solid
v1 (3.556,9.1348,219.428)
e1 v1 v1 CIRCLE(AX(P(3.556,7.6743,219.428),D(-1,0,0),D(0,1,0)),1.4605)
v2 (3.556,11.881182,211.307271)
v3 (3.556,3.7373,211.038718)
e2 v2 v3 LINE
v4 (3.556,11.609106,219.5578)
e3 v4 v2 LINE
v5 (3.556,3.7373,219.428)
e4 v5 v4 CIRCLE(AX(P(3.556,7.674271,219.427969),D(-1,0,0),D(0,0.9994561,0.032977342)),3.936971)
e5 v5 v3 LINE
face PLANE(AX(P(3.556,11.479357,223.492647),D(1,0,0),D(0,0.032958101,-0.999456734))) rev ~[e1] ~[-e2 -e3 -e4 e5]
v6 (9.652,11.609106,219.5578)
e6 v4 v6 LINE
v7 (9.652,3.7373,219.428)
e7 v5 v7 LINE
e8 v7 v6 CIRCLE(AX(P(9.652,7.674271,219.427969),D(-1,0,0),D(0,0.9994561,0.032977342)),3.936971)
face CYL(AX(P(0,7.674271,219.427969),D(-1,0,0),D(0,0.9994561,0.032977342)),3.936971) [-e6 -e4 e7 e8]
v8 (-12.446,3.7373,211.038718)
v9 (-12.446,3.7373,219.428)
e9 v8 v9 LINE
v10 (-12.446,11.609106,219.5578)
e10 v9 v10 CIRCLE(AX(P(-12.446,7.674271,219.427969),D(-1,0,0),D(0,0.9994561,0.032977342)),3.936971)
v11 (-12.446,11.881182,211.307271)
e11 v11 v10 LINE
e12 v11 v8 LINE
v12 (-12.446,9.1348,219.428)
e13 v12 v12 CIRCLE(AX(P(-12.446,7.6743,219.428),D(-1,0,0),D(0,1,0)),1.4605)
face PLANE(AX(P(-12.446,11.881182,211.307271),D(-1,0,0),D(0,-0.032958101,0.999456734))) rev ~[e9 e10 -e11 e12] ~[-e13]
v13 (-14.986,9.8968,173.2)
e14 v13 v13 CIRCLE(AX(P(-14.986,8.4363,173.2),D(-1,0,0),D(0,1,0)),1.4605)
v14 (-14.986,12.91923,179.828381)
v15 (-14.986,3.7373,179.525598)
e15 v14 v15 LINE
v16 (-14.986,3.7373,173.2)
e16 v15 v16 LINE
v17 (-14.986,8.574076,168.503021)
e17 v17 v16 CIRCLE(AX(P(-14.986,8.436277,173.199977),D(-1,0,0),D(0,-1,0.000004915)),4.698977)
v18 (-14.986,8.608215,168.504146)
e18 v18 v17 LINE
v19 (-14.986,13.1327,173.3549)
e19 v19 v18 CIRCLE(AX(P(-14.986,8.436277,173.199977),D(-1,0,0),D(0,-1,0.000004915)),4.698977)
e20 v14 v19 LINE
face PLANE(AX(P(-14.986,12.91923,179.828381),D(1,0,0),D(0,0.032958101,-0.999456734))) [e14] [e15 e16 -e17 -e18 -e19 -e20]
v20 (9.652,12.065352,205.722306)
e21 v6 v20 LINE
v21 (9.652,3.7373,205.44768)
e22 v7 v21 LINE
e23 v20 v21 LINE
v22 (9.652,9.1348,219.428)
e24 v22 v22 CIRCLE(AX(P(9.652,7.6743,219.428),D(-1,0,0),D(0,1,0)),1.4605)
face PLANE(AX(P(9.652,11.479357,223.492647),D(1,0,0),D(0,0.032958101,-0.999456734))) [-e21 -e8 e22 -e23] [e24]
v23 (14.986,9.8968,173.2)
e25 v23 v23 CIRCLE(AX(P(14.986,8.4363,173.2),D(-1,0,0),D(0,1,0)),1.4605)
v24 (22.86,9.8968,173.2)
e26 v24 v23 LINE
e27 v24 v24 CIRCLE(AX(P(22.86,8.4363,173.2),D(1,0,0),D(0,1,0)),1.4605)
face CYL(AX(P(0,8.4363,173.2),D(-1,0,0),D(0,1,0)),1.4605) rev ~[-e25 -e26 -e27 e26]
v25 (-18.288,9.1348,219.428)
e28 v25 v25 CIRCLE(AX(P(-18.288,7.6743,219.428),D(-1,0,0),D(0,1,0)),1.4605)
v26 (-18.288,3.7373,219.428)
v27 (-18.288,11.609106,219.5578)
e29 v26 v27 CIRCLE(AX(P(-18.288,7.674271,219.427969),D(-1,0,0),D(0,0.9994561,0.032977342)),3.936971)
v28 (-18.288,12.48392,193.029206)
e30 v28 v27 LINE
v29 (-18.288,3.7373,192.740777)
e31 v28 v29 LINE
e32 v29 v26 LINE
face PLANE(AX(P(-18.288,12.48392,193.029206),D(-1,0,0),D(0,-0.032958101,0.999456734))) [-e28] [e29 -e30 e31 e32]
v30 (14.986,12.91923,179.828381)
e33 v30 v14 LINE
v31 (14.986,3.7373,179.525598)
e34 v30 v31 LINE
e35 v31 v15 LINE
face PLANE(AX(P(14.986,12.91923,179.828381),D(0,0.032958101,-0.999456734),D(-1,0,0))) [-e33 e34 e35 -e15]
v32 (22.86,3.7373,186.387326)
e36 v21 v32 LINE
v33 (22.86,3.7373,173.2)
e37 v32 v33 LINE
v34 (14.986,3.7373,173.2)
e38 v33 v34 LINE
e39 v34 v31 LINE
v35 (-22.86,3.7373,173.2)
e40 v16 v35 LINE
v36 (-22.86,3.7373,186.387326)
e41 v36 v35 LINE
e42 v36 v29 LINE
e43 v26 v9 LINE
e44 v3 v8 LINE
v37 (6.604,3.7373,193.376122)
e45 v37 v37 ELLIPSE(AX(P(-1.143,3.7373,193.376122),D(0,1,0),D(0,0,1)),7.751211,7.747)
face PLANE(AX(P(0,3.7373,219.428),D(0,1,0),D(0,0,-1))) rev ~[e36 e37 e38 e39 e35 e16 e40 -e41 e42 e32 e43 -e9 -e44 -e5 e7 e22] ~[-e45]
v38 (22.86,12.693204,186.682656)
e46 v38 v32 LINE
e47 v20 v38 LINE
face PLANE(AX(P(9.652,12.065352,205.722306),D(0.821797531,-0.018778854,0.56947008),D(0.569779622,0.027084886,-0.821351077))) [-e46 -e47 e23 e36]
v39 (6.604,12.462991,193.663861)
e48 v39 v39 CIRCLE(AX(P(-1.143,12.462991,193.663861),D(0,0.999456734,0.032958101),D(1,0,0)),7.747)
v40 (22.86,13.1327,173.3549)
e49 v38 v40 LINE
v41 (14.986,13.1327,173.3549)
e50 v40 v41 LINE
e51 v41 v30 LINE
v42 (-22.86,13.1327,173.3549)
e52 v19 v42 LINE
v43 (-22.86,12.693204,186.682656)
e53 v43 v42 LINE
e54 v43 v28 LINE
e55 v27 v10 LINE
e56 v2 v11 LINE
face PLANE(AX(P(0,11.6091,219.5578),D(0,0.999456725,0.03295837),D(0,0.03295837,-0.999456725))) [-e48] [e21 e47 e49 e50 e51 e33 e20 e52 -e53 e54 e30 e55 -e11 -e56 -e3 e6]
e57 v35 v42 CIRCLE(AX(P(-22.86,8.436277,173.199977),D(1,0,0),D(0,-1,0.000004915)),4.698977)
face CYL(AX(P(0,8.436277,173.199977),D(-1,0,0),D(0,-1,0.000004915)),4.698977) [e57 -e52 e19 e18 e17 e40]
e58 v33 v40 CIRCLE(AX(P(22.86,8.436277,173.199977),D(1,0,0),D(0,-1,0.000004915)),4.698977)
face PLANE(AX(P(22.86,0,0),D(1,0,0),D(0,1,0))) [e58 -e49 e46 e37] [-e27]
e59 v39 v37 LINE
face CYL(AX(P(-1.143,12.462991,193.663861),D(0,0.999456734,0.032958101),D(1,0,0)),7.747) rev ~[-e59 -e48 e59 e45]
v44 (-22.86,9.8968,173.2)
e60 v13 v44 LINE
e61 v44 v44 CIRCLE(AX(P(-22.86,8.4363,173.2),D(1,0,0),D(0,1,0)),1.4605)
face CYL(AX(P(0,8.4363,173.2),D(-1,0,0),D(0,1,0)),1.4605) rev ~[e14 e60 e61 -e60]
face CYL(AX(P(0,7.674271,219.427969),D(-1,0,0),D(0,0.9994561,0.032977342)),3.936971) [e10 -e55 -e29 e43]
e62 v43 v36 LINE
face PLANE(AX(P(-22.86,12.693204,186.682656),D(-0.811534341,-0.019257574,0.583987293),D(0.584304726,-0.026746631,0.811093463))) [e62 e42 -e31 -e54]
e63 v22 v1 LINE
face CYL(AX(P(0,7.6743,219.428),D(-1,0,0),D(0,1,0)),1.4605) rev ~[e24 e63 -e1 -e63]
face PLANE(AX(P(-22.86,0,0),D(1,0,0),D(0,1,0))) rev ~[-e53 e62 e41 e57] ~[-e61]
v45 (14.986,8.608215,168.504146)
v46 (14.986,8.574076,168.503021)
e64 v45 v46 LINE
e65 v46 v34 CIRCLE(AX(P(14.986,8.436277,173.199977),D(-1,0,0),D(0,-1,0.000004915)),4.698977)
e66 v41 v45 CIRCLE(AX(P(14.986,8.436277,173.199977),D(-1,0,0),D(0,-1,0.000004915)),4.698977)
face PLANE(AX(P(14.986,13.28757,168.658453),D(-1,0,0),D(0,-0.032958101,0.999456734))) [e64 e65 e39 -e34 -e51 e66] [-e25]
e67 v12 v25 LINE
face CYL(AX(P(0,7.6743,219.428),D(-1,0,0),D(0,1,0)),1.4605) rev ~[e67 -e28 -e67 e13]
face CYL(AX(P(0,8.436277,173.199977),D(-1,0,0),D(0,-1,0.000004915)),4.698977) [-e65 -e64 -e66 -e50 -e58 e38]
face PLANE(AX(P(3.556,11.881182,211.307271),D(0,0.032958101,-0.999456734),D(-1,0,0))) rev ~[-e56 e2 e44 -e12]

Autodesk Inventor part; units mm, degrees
ref_plane "YZ Plane" through (0, 0, 0) normal (1, 0, 0) x (0, 1, 0)
sketch "Sketch2" plane through (0, 0, 0) normal (1, 0, 0) x (0, 1, 0)
  arc A0 (11.6091, 219.5578) -> (3.7373, 219.428) centre (7.6743, 219.428) ccw
  circle A1 centre (7.6743, 219.428) radius 1.4605
  arc A2 (3.7373, 173.2) -> (13.1327, 173.3549) centre (8.4363, 173.2) ccw
  circle A3 centre (8.4363, 173.2) radius 1.4605
  line L0 (3.7373, 219.428) -> (3.7373, 173.2)
  line L1 (39.8145, 223.365) -> (24.6856, 223.365) construction
  line L2 (42.3544, 168.501) -> (22.3114, 168.501) construction
  line L3 (11.6091, 219.5578) -> (13.1327, 173.3549)
  point P0 (0, 0)
  point P1 (32.3329, 168.501)
  dimension "d0" = 7.874
  dimension "d1" = 2.921
  dimension "d2" = 9.398
  dimension "d3" = 2.921
  dimension "d4" = 54.864
extrude "Extrusion1" add sketch "Sketch2" along normal mid plane 45.72
sketch "Sketch3" plane through (-22.86, 13.1327, 173.3549) normal (0, 0.9994567, 0.0329581) x (1, 0, 0)
  line L0 (0, 0) -> (0, -46.228) projected
  line L1 (0, -50.165) -> (45.72, -50.165) projected
  line L2 (0, 4.699) -> (45.72, 4.699) projected
  line L3 (45.72, 4.699) -> (45.72, -0.1549) projected
  line L4 (0, -0.1549) -> (0, 4.699) projected
  line L5 (0, -50.165) -> (0, -46.228) projected
  line L6 (10.414, -50.165) -> (26.416, -50.165)
  line L7 (26.416, -50.165) -> (26.416, -37.973)
  line L8 (26.416, -37.973) -> (10.414, -37.973)
  line L9 (10.414, -37.973) -> (10.414, -50.165)
  line L10 (0, -50.165) -> (0, -13.335)
  line L11 (0, -13.335) -> (4.572, -19.685)
  line L12 (4.572, -19.685) -> (4.572, -50.165)
  line L13 (4.572, -50.165) -> (0, -50.165)
  line L14 (47.5768, -13.335) -> (-11.8241, -13.335) construction
  line L15 (7.874, 4.699) -> (37.846, 4.699)
  line L16 (37.846, 4.699) -> (37.846, -6.477)
  line L17 (37.846, -6.477) -> (7.874, -6.477)
  line L18 (7.874, -6.477) -> (7.874, 4.699)
  line L19 (45.72, -46.228) -> (45.72, 0) projected
  line L20 (45.72, -13.335) -> (45.72, -50.165)
  line L21 (45.72, -50.165) -> (32.512, -50.165)
  line L22 (32.512, -50.165) -> (32.512, -32.385)
  line L23 (32.512, -32.385) -> (45.72, -13.335)
  circle A0 centre (21.717, -20.32) radius 7.747
  line L24 (13.97, -14.4458) -> (13.97, -24.81) construction
  line L25 (12.0083, -12.573) -> (20.6899, -12.573) construction
  point P0 (22.86, 172.8279)
  point P1 (0, -46.3578)
  dimension "d10" = 5.842
  dimension "d12" = 16.002
  dimension "d14" = 30.48
  dimension "d16" = 7.874
  dimension "d17" = 11.176
  dimension "d18" = 12.192
  dimension "d21" = 36.83
  dimension "d22" = 6.096
  dimension "d24" = 17.78
  dimension "d25" = 15.494
  dimension "d26" = 6.096
  dimension "d27" = 9.398
  dimension "d28" = 29.972
  dimension "d29" = 4.572
extrude "Extrusion2" cut sketch "Sketch3" against normal through all contours L11 L12 L1 L5 L0 | L2 L16 L17 L18 | L9 L8 L7 L1 | L22 L23 L19 L20 L1 | A0
ref_plane "Work Plane1" through (0, 7.6743, 223.365) normal (0, 0, 1) x (1, 0, 0)
ref_plane "Work Plane2" through (0, 8.4363, 168.501) normal (0, 0, 1) x (1, 0, 0)
properties part number "Transmission Plate - Bottom"
